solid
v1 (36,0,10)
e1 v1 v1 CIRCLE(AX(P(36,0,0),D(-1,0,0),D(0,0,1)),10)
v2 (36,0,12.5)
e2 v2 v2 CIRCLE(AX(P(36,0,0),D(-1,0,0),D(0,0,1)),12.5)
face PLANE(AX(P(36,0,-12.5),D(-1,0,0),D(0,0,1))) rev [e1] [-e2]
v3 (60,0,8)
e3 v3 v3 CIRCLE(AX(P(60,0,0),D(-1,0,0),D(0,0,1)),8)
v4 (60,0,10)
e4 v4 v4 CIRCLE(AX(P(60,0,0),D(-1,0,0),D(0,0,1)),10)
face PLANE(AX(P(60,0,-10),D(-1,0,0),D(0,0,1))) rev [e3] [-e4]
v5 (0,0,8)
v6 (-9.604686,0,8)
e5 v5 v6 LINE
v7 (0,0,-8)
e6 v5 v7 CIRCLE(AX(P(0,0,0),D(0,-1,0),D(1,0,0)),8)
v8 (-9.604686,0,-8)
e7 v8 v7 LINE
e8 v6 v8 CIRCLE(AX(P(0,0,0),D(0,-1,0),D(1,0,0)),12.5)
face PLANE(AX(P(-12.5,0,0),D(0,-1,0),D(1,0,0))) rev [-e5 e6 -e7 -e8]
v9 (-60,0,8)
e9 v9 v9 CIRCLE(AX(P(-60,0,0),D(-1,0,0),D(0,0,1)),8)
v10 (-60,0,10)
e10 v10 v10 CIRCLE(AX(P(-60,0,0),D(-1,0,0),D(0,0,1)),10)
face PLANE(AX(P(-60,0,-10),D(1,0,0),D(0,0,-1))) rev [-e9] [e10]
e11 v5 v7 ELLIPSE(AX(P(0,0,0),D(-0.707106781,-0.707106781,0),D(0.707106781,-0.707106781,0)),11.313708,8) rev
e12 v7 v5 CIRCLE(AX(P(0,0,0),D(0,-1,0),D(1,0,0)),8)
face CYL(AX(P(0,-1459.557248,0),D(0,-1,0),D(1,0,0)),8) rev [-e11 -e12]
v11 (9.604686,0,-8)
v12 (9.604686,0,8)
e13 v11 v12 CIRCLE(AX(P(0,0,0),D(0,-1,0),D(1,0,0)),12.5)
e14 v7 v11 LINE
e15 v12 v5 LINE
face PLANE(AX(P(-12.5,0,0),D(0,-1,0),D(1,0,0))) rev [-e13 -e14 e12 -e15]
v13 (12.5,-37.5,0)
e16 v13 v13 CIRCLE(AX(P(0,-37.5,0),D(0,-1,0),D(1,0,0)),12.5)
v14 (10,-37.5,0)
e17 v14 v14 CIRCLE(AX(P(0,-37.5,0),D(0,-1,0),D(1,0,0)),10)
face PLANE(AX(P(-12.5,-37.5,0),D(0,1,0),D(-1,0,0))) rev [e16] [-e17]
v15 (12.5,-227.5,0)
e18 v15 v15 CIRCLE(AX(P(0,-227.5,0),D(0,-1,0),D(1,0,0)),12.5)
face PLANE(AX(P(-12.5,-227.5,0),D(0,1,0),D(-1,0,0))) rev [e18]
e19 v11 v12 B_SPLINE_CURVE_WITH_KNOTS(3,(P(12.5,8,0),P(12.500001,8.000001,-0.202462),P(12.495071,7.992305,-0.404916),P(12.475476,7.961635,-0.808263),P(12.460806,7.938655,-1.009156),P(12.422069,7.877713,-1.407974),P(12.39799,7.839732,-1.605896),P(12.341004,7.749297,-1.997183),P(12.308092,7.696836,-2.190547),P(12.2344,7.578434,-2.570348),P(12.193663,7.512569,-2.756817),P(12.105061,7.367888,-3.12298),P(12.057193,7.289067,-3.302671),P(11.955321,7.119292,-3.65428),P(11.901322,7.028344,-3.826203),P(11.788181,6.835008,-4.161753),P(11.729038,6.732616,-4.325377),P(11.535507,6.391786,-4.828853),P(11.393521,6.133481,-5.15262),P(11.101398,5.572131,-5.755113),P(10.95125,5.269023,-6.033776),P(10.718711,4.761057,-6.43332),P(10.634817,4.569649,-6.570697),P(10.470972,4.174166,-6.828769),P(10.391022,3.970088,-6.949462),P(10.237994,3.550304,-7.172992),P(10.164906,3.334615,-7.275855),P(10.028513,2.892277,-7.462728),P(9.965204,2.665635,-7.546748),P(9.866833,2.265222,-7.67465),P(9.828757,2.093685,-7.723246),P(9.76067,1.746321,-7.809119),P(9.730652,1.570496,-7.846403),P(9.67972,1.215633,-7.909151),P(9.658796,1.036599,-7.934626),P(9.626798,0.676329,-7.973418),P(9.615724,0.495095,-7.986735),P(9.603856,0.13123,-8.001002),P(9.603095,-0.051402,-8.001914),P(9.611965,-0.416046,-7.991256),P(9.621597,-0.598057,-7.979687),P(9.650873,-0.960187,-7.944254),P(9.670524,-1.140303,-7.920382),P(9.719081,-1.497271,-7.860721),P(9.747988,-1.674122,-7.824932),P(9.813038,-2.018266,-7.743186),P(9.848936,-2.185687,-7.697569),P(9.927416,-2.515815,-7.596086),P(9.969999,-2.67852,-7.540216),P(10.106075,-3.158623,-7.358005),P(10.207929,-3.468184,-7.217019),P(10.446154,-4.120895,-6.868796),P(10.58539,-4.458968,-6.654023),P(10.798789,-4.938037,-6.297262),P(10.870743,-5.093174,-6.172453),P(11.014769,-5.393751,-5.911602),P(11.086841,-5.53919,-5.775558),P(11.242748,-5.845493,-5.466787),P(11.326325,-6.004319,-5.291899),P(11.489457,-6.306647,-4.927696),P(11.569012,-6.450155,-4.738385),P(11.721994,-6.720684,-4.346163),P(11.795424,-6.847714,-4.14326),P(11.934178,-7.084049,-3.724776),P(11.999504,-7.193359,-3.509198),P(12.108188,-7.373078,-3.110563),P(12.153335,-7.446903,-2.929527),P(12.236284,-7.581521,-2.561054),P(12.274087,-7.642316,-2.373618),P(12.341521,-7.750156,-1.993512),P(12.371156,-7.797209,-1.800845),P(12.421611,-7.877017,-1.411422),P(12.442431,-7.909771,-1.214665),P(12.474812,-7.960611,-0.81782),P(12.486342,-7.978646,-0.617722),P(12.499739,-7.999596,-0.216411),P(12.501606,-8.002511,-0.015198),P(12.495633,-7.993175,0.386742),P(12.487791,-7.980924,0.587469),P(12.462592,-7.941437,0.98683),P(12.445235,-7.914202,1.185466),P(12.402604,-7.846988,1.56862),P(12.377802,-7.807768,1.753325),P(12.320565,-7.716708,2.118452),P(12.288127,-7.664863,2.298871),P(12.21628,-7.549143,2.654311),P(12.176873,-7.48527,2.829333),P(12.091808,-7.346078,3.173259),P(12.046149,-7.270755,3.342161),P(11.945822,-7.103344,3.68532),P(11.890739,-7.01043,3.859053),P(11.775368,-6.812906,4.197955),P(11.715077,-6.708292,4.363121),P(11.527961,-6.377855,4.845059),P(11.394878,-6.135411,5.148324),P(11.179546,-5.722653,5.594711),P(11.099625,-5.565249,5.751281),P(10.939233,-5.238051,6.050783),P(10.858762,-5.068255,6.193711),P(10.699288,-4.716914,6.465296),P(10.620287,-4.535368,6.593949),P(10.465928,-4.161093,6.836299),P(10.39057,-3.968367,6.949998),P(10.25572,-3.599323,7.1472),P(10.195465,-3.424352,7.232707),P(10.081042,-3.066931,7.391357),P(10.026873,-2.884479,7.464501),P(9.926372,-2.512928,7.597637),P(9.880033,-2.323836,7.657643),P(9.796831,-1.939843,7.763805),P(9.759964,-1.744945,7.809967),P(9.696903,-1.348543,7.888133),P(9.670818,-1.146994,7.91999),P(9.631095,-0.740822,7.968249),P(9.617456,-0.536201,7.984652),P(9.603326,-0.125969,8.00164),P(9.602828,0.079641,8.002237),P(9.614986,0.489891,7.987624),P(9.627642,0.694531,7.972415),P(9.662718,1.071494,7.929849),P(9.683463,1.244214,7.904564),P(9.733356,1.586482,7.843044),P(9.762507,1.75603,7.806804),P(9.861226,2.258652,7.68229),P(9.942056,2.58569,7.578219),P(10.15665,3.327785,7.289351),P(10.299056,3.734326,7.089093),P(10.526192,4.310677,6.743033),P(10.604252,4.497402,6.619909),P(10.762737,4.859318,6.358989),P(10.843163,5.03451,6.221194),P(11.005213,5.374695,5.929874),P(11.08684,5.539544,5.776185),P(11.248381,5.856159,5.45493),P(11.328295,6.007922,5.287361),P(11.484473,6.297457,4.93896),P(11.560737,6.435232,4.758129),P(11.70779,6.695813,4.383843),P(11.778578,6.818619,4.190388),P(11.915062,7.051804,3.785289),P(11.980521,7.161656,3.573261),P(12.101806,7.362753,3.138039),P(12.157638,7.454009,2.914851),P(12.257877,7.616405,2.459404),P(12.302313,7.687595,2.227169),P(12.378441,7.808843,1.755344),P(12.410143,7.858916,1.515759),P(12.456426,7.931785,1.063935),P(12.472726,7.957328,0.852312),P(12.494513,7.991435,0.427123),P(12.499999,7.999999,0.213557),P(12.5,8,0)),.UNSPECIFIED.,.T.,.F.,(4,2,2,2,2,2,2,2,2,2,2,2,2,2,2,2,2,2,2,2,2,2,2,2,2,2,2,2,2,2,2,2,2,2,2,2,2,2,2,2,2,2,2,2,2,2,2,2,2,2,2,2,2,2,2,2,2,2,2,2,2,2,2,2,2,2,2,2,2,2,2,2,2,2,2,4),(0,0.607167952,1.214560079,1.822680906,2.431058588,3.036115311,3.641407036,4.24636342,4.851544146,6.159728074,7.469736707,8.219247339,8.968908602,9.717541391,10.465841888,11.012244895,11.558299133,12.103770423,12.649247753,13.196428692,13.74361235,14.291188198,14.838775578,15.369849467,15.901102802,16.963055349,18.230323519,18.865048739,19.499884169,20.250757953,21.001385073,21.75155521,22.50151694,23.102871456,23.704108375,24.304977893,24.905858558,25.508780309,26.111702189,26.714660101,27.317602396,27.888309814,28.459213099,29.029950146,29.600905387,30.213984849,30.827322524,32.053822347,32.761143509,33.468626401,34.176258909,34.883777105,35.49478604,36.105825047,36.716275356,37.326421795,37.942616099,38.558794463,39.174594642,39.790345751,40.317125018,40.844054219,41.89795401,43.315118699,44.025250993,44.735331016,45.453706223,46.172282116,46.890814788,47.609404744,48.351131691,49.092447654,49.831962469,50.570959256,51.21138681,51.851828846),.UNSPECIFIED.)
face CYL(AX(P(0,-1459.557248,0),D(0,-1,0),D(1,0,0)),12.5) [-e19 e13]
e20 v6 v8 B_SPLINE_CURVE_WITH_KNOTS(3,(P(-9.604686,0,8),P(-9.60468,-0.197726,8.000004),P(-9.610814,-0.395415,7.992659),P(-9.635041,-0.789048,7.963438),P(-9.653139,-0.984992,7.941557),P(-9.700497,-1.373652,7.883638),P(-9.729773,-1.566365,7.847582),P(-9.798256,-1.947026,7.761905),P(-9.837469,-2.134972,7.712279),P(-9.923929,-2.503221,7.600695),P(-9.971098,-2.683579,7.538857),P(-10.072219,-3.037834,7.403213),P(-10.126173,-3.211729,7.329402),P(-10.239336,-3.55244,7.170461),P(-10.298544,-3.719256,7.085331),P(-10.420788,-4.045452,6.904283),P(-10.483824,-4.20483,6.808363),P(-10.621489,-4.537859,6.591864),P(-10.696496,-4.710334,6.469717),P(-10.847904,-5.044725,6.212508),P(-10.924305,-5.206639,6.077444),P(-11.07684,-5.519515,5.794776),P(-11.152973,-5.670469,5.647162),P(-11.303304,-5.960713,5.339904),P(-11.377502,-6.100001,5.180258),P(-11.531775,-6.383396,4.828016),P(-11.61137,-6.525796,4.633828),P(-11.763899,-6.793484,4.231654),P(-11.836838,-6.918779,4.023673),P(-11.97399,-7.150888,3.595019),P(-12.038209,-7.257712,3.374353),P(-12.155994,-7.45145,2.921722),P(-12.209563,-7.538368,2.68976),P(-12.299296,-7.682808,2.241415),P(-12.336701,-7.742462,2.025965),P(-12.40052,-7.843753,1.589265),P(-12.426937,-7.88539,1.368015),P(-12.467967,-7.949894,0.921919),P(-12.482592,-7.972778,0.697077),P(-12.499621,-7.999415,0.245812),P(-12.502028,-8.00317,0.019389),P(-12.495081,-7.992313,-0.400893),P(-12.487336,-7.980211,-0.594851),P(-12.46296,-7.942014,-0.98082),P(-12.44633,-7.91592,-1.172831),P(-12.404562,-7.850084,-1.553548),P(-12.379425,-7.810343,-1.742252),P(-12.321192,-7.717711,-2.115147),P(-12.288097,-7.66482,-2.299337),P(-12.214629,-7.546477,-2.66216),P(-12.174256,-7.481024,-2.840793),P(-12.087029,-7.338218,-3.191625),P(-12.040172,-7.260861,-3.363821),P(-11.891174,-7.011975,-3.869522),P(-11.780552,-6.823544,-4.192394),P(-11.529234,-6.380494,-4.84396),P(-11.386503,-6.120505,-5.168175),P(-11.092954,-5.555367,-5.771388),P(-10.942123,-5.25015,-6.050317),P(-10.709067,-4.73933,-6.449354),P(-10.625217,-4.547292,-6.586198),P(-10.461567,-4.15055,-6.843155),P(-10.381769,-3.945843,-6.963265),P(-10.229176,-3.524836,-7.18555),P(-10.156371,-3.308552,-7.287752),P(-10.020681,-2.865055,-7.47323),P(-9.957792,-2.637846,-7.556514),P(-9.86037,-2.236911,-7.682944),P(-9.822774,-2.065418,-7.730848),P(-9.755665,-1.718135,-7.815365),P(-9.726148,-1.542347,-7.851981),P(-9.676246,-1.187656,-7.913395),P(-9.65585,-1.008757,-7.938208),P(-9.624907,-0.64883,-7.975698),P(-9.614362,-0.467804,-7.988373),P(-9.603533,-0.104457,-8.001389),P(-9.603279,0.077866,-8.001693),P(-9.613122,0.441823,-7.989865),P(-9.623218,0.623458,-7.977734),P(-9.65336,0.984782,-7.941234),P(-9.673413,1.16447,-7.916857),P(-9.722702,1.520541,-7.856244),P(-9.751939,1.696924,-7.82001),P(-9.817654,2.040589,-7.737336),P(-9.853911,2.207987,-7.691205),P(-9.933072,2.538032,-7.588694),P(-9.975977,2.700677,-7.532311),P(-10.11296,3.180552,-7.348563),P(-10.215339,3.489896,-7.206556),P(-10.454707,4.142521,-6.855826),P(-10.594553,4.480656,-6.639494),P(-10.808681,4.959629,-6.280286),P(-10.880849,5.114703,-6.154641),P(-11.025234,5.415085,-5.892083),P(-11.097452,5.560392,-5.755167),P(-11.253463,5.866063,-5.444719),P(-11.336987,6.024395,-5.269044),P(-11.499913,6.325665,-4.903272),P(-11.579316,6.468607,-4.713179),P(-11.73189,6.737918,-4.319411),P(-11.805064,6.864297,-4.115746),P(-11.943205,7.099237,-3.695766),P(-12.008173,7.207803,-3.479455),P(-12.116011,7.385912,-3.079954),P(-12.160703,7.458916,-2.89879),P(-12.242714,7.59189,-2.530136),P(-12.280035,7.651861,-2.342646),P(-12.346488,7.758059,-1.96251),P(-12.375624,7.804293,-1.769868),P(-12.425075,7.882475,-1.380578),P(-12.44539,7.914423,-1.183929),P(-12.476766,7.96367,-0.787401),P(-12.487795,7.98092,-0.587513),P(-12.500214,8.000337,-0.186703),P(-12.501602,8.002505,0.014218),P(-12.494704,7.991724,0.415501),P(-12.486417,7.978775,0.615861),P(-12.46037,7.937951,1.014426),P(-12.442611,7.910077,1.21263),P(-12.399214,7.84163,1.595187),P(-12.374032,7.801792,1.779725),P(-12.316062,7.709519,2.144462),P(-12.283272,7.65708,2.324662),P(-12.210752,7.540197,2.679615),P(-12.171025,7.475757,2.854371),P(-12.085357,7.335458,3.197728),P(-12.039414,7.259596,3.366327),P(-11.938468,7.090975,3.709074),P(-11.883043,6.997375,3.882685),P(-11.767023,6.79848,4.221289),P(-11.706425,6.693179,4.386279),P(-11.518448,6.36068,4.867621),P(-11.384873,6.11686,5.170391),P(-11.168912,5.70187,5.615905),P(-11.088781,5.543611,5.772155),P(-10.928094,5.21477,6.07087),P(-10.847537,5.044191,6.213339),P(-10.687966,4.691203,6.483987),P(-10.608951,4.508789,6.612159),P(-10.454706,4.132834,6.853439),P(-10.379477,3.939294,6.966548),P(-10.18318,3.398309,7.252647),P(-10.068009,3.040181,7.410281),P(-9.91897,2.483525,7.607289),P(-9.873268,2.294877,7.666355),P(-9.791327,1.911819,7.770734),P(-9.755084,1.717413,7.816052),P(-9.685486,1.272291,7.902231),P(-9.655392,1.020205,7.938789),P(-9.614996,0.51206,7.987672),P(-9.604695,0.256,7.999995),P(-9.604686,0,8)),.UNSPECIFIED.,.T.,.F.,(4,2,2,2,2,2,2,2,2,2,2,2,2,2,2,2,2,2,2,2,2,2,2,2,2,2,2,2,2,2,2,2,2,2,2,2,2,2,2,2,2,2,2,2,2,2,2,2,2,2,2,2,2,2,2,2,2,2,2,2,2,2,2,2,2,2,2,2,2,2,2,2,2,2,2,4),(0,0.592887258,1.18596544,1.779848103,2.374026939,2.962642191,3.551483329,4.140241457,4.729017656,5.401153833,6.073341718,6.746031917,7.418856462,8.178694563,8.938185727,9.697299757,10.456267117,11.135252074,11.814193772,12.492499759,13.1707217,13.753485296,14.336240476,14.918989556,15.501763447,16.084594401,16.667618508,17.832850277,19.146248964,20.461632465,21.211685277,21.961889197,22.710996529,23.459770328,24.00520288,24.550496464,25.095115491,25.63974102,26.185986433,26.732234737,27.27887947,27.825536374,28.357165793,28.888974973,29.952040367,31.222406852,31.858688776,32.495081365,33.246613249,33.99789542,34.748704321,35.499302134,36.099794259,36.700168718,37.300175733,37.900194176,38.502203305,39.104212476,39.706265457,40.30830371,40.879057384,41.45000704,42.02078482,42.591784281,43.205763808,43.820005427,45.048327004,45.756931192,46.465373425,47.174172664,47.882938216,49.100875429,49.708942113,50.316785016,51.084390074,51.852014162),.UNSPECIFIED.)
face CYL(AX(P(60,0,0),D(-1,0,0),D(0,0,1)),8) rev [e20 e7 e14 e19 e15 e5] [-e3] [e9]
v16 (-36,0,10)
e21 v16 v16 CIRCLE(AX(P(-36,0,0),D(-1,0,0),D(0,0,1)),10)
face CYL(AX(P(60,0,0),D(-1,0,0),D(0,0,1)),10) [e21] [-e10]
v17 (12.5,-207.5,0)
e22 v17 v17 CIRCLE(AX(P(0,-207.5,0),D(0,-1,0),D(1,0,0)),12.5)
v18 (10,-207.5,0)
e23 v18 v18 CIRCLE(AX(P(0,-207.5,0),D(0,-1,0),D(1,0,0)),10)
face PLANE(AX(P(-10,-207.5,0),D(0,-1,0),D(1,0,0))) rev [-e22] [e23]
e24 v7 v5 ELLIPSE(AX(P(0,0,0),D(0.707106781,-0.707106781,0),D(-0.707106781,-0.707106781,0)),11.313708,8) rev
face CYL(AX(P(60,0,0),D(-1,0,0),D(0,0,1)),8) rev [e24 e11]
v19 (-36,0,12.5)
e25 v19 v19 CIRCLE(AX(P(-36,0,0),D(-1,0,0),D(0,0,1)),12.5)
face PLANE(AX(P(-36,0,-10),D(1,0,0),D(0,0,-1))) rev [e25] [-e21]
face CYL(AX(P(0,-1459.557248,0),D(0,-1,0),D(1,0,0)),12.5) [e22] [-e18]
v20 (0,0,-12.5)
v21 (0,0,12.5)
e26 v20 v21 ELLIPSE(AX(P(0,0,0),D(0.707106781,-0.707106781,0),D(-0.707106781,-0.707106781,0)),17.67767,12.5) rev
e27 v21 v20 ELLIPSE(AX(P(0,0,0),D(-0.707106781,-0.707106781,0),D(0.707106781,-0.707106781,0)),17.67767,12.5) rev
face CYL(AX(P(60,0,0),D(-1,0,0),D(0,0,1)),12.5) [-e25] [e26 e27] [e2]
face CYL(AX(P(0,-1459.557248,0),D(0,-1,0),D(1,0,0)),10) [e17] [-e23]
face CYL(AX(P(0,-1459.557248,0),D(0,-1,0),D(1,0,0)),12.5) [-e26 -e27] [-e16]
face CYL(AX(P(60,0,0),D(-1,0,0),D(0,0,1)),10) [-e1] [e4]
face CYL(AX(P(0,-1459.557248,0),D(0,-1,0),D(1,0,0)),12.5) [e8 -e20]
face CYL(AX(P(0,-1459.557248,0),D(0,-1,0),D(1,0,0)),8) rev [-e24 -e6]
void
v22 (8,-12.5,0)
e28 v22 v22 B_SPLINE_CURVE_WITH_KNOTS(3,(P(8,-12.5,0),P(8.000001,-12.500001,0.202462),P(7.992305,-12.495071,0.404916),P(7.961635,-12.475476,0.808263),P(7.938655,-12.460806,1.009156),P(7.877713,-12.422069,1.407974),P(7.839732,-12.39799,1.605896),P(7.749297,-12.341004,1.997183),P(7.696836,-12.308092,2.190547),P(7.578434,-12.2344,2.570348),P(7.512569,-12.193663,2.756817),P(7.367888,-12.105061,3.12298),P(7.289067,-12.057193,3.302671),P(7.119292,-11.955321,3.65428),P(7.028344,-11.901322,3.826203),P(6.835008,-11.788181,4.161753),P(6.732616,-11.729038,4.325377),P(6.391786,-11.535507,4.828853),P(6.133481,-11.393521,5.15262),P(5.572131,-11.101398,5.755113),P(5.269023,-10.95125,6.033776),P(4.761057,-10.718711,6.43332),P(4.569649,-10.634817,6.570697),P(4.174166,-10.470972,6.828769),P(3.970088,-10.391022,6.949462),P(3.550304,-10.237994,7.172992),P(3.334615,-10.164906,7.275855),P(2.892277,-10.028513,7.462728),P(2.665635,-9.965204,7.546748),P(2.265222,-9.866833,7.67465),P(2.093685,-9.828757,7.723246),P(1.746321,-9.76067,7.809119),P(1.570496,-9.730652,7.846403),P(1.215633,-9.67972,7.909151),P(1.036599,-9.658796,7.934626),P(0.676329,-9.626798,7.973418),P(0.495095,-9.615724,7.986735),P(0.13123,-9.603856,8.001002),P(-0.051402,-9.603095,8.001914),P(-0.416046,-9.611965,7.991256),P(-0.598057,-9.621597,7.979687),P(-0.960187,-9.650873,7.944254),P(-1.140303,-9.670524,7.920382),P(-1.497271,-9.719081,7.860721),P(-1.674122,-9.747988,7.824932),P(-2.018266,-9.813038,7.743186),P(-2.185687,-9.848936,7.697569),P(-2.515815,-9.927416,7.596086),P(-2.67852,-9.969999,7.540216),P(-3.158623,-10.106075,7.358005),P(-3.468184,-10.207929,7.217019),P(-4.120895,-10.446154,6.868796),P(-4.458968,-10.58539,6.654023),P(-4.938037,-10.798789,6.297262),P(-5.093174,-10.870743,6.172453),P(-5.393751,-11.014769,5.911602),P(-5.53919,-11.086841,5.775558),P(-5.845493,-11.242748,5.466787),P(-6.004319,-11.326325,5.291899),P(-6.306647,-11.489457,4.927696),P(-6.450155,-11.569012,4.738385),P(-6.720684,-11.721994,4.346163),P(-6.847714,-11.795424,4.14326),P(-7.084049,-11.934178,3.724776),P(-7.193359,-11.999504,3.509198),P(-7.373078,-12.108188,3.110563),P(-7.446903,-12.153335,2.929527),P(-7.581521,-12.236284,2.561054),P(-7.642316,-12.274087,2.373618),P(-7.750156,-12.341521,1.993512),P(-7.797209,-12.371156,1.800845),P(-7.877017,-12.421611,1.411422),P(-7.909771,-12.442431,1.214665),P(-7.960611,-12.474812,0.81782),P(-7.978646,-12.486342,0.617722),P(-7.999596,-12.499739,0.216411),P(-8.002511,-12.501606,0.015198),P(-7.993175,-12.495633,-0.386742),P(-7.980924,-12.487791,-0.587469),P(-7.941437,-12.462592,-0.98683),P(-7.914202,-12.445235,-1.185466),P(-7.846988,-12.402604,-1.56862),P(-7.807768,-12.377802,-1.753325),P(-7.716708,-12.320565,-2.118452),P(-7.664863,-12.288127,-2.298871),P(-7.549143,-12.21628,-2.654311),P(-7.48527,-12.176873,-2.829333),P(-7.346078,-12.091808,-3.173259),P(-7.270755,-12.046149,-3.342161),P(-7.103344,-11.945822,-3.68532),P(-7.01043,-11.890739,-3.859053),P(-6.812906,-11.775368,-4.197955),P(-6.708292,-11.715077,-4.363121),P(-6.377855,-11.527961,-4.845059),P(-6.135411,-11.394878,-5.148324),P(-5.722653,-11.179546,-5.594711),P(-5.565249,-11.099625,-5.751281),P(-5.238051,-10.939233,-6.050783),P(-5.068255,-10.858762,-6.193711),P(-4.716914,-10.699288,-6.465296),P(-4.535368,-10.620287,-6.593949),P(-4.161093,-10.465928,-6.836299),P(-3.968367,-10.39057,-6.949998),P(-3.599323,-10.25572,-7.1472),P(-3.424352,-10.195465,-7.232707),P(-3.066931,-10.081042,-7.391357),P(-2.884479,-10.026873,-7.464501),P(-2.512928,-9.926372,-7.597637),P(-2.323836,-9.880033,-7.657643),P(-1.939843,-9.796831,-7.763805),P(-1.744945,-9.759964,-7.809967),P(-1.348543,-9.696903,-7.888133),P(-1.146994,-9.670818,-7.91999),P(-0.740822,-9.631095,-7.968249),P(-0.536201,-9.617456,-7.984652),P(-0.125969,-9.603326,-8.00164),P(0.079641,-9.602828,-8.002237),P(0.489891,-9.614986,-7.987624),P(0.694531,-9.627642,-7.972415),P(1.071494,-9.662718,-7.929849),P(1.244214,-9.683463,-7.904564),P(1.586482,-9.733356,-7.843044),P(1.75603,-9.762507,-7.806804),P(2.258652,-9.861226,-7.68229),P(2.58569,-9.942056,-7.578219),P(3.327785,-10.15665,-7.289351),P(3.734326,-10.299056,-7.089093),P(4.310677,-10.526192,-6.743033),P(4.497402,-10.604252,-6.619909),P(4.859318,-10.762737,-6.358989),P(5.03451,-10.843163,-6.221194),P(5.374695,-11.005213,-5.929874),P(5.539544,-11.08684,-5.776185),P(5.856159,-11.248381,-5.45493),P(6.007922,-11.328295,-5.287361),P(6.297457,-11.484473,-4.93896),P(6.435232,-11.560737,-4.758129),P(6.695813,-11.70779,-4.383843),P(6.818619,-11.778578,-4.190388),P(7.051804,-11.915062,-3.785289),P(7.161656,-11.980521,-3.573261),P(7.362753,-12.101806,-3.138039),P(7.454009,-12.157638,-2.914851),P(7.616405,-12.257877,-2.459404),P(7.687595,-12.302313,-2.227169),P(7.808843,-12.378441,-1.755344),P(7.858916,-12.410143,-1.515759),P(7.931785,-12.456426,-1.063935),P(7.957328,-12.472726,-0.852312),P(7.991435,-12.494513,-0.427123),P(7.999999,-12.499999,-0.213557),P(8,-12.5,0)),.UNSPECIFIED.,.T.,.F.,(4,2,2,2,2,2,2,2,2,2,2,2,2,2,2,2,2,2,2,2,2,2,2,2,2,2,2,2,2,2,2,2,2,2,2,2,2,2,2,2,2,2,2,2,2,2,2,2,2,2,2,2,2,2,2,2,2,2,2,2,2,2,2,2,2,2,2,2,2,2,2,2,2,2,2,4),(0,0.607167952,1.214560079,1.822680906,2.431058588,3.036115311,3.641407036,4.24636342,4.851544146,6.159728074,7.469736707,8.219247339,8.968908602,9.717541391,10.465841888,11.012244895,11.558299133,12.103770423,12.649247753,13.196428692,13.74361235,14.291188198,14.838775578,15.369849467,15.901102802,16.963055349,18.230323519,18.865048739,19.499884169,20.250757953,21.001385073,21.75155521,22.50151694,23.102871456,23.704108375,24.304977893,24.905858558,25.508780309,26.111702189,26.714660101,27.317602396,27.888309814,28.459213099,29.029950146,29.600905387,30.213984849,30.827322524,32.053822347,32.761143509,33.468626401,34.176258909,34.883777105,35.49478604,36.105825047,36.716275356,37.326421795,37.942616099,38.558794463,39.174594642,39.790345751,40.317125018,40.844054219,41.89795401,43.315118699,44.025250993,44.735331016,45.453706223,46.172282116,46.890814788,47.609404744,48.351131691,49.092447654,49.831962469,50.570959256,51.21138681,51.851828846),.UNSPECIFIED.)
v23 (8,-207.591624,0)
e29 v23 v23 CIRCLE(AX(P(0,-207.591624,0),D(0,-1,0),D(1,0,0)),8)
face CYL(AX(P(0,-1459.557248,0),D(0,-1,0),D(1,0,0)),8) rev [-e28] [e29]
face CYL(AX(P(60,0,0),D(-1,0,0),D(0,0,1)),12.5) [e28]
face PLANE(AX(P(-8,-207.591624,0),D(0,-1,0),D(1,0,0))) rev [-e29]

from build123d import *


with BuildPart() as part:
    # 草图1 → Revolve 394 (revolve)
    with BuildSketch(Plane.XY):
        Polygon((-12.5, 0), (-12.5, -37.5), (-10, -37.5), (-10, -207.5), (-12.5, -207.5), (-12.5, -227.5), (0, -227.5), (0, -207.591623727), (-8, -207.591623727), (-8, 0), align=None)
    revolve(axis=Axis((0, -1459.557248463, 0), (0, 1, 0)))


with BuildPart() as revolve_813_tool:
    # 草图3 → Revolve 813 (revolve)
    with BuildSketch(Plane(origin=(0, 0, 0), x_dir=(1, 0, 0), z_dir=(0, 1, 0))):
        Polygon((-60, 10), (-40, 10), (-36, 10), (-36, 12.5), (36, 12.5), (36, 10), (60, 10), (60, 8), (-60, 8), align=None)
    revolve(axis=Axis((60, 0, 0), (1, 0, 0)))


with BuildPart() as part_1:
    add(part.part)


with BuildPart() as part_2:
    # Revolve 813: joined with revolve_813_tool
    add(part_1.part.fuse(revolve_813_tool.part, tol=0.00001))


solid = part_2.part
